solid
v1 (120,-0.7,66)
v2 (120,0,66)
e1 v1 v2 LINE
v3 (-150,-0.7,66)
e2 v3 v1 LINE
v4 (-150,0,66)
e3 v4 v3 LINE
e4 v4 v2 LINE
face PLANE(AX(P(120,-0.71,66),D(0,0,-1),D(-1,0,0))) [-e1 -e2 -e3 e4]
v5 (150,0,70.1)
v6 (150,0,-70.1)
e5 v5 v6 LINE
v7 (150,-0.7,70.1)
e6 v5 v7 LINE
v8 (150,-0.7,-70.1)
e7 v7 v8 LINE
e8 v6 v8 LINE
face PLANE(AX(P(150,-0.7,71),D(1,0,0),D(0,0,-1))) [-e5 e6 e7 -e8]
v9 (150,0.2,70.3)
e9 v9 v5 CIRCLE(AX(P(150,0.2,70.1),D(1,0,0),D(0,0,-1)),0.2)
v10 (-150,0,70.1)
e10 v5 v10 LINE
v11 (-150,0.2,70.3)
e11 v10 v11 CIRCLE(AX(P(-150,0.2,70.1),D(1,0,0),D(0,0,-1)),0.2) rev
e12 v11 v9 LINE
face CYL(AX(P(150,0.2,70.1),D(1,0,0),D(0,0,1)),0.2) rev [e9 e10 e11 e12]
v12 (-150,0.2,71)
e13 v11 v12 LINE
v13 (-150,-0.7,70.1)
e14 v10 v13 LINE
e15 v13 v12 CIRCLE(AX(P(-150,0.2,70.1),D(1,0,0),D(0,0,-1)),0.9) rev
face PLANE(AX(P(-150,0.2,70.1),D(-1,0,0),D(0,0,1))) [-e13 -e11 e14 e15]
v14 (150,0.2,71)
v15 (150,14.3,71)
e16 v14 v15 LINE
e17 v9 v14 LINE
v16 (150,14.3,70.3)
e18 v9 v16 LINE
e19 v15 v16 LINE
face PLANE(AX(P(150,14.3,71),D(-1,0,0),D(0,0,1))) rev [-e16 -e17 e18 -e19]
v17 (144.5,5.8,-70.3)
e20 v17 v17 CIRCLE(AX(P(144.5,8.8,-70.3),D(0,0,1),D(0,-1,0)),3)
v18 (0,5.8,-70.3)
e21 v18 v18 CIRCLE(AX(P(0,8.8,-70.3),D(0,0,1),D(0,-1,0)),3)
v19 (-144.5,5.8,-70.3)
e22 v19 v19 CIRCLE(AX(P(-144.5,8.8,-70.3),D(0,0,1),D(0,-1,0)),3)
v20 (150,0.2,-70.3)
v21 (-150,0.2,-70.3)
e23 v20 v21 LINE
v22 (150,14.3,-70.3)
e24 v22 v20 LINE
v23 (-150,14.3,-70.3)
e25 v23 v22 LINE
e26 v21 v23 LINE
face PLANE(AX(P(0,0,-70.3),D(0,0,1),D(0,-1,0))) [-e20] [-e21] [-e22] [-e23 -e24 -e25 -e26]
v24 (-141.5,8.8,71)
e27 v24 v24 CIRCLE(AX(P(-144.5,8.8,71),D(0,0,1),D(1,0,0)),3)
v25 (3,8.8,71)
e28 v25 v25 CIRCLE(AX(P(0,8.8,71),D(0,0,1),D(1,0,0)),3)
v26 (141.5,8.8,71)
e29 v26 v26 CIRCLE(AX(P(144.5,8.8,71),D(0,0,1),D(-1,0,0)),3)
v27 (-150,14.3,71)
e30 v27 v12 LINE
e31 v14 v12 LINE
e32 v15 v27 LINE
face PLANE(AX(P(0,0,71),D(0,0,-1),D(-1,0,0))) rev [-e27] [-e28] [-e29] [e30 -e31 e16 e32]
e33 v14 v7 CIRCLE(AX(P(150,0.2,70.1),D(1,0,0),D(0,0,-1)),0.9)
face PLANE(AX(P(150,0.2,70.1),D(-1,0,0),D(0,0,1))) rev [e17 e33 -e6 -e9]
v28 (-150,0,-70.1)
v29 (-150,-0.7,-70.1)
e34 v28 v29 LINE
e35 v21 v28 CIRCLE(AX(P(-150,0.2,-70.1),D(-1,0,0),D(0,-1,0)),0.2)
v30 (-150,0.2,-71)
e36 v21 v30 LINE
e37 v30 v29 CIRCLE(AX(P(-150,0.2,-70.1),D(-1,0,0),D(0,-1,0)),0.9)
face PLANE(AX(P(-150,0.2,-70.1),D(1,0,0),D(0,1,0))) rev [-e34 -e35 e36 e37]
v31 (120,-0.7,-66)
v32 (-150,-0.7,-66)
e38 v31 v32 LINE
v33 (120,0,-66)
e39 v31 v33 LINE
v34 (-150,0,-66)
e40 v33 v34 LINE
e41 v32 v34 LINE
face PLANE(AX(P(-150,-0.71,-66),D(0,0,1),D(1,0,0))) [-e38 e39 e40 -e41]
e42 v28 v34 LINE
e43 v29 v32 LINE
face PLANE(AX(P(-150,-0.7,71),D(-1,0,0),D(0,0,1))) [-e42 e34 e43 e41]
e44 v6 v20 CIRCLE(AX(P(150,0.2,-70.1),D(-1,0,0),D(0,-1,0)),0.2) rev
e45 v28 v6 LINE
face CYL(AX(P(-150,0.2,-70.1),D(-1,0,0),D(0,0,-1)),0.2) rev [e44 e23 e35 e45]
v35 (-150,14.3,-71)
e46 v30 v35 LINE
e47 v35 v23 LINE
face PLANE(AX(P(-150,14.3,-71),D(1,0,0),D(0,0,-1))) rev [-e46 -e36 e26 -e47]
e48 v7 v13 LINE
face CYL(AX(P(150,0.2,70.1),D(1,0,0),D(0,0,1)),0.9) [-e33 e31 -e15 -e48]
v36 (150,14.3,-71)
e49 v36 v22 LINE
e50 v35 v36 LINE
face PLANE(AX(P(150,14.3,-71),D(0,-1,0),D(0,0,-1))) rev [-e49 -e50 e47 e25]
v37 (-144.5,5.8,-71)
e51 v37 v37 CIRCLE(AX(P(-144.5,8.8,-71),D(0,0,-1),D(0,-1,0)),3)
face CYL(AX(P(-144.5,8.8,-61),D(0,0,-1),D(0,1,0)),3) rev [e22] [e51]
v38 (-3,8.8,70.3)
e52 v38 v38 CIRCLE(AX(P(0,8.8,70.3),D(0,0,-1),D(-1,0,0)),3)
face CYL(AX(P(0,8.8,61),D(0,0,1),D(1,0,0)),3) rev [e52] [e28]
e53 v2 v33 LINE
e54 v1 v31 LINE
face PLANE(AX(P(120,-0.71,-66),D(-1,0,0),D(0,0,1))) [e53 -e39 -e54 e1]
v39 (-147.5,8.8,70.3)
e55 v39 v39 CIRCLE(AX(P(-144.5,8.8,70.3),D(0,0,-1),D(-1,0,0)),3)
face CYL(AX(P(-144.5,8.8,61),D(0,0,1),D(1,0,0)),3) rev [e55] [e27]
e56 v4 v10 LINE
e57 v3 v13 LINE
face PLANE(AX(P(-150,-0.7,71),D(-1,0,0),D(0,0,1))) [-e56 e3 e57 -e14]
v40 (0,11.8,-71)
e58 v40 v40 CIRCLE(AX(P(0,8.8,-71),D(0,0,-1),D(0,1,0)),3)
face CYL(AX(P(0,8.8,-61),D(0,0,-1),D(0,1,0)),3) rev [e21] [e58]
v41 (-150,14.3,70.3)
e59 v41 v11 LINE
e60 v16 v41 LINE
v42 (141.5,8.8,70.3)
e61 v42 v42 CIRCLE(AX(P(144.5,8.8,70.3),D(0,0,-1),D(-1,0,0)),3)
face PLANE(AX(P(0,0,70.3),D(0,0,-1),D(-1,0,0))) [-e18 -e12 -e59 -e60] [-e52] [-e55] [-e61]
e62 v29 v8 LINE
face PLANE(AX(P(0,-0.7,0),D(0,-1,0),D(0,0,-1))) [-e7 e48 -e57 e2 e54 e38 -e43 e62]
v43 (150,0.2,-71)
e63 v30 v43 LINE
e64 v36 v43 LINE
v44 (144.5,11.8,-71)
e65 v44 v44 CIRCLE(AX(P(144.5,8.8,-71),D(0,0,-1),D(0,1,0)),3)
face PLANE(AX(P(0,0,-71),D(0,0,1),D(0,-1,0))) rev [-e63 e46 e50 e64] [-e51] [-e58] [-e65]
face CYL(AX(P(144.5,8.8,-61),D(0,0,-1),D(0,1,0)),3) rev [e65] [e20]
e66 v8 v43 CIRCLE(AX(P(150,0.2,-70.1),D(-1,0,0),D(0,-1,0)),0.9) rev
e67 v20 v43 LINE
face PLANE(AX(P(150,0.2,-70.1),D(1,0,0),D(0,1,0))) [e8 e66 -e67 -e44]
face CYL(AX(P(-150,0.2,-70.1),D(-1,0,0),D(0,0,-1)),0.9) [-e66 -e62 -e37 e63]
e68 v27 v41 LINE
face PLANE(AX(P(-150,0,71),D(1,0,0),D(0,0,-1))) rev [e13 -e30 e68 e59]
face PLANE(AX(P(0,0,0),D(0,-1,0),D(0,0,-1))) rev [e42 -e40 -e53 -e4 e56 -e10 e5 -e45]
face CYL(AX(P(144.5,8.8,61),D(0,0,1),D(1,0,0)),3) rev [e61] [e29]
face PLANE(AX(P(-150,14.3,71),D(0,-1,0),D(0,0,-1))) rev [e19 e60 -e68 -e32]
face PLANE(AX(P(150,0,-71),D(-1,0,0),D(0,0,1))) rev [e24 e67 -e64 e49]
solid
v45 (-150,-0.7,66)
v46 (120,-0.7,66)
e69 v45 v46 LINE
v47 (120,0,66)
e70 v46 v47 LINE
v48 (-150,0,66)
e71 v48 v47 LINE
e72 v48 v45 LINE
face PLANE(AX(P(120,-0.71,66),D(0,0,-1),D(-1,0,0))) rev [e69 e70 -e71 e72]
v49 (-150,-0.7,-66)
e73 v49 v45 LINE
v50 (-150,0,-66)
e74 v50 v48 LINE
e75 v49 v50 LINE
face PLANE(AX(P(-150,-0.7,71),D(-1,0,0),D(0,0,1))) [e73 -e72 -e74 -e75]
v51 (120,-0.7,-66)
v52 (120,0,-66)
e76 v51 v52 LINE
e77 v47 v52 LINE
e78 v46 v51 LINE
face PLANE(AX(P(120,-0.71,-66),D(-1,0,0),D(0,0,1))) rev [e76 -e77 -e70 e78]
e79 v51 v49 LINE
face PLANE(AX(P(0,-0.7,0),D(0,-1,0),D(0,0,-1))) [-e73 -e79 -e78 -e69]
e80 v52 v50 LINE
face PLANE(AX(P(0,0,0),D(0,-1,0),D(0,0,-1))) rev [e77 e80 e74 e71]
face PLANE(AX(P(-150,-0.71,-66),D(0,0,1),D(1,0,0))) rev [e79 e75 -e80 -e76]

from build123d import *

# Parameters (mm, degrees)
SKETCH_1_W                         = 300
SKETCH_1_H                         = 142
SM_BASE_FLANGE_1_DEPTH             = 0.7
SM_EDGE_FLANGE_1_STRIP_W           = 3.2
SM_EDGE_FLANGE_1_STRIP_H           = 0.7
SM_EDGE_FLANGE_1_STRIP_CUT_DEPTH   = 300
SM_EDGE_FLANGE_1_STRIP_2_W         = 3.2
SM_EDGE_FLANGE_1_STRIP_2_H         = 0.7
SM_EDGE_FLANGE_1_STRIP_CUT_2_DEPTH = 300
SM_EDGE_FLANGE_1_DEPTH             = 300
SM_EDGE_FLANGE_1_BEND_DEPTH        = 300
SKETCH_18_R                        = 3
CUT_EXTRUDE_1_DEPTH                = 10
CUT_EXTRUDE_START                  = -10
SKETCH_20_R                        = 3
CUT_EXTRUDE_2_DEPTH                = 10
SPLIT_BODIES_1_SURFACE_1_BACK      = 333.248
SPLIT_BODIES_1_SURFACE_1_DEPTH     = 666.496
SPLIT_BODIES_1_SURFACE_2_BACK      = 333.248
SPLIT_BODIES_1_SURFACE_2_DEPTH     = 666.496


# Sheet-metal steps are written as plain solids
with BuildPart() as part:
    # 草图1 → 基体-法兰1 (new body)
    with BuildSketch(Plane(origin=(0, 0, 0), x_dir=(1, 0, 0), z_dir=(0, 1, 0))):
        Rectangle(SKETCH_1_W, SKETCH_1_H)
    extrude(amount=-SM_BASE_FLANGE_1_DEPTH)

    # 边线-法兰1 strip (across the edge) → 边线-法兰1 strip cut (cut)
    with BuildSketch(Plane(origin=(150, 0, -71), x_dir=(0, 0, 1), z_dir=(-1, 0, 0))):
        with Locations((-0.7, -0.35)):
            Rectangle(SM_EDGE_FLANGE_1_STRIP_W, SM_EDGE_FLANGE_1_STRIP_H)
    extrude(amount=SM_EDGE_FLANGE_1_STRIP_CUT_DEPTH, mode=Mode.SUBTRACT)

    # 边线-法兰1 strip 2 (across the edge) → 边线-法兰1 strip cut 2 (cut)
    with BuildSketch(Plane(origin=(-150, 0, 71), x_dir=(0, 0, -1), z_dir=(1, 0, 0))):
        with Locations((-0.7, -0.35)):
            Rectangle(SM_EDGE_FLANGE_1_STRIP_2_W, SM_EDGE_FLANGE_1_STRIP_2_H)
    extrude(amount=SM_EDGE_FLANGE_1_STRIP_CUT_2_DEPTH, mode=Mode.SUBTRACT)

    # 边线-法兰1 section (across the edge) → 边线-法兰1 (add)
    with BuildSketch(Plane(origin=(150, 0, -71), x_dir=(0, 0, 1), z_dir=(-1, 0, 0))):
        with BuildLine():
            Line((0, 0.2), (0, 14.3))
            Line((0, 14.3), (0.7, 14.3))
            Line((0.7, 14.3), (0.7, 0.2))
            ThreePointArc((0.7, 0.2), (0.758578644, 0.058578644), (0.9, 0))
            Line((0.9, 0), (0.9, -0.7))
            ThreePointArc((0.9, -0.7), (0.263603897, -0.436396103), (0, 0.2))
        make_face()
    extrude(amount=SM_EDGE_FLANGE_1_DEPTH)

    # 边线-法兰1 section 2 (across the edge) → 边线-法兰1 bend (add)
    with BuildSketch(Plane(origin=(-150, 0, 71), x_dir=(0, 0, -1), z_dir=(1, 0, 0))):
        with BuildLine():
            Line((0, 0.2), (0, 14.3))
            Line((0, 14.3), (0.7, 14.3))
            Line((0.7, 14.3), (0.7, 0.2))
            ThreePointArc((0.7, 0.2), (0.758578644, 0.058578644), (0.9, 0))
            Line((0.9, 0), (0.9, -0.7))
            ThreePointArc((0.9, -0.7), (0.263603897, -0.436396103), (0, 0.2))
        make_face()
    extrude(amount=SM_EDGE_FLANGE_1_BEND_DEPTH)

    # 草图18 → 切除-拉伸1 (cut)
    with BuildSketch(Plane(origin=(0, 0, -71), x_dir=(-1, 0, 0), z_dir=(0, 0, -1))):
        with Locations(Location((-144.5, 8.8, 0), (0, 0, 90))):
            Circle(SKETCH_18_R)
        with Locations(Location((0, 8.8, 0), (0, 0, 90))):
            Circle(SKETCH_18_R)
        with Locations(Location((144.5, 8.8, 0), (0, 0, 270))):
            Circle(SKETCH_18_R)
    extrude(amount=-CUT_EXTRUDE_1_DEPTH, mode=Mode.SUBTRACT)

    # 草图20 → 切除-拉伸2 (cut)
    with BuildSketch(Plane.XY.offset(71).offset(CUT_EXTRUDE_START)):
        with Locations(Location((-144.5, 8.8, 0), (0, 0, 270))):
            Circle(SKETCH_20_R)
        with Locations(Location((0, 8.8, 0), (0, 0, 90))):
            Circle(SKETCH_20_R)
        with Locations(Location((144.5, 8.8, 0), (0, 0, 90))):
            Circle(SKETCH_20_R)
    extrude(amount=CUT_EXTRUDE_2_DEPTH, mode=Mode.SUBTRACT)


with BuildPart() as body_2:
    # Split Bodies 1: the piece behind the surface
    add(part.part)
    # Split Bodies 1 surface: a surface, the sketch's curves swept straight by 666.496 mm
    with BuildLine(Plane(origin=(0, 0, 0), x_dir=(1, 0, 0), z_dir=(0, 1, 0)).offset(-SPLIT_BODIES_1_SURFACE_1_BACK), mode=Mode.PRIVATE) as split_bodies_1_surface_1_path:
        Line((-150, 66), (120, 66))
        Line((120, 66), (120, -66))
        Line((120, -66), (-150, -66))
    split_bodies_1_surface_1 = Shell.extrude(split_bodies_1_surface_1_path.wire(), (0 * SPLIT_BODIES_1_SURFACE_1_DEPTH, 1 * SPLIT_BODIES_1_SURFACE_1_DEPTH, 0 * SPLIT_BODIES_1_SURFACE_1_DEPTH))
    split(bisect_by=split_bodies_1_surface_1, keep=Keep.BOTTOM)


with BuildPart() as part_1:
    add(part.part)

    # Split Bodies 1: split by a surface, the side it looks to stays
    # Split Bodies 1 surface: a surface, the sketch's curves swept straight by 666.496 mm
    with BuildLine(Plane(origin=(0, 0, 0), x_dir=(1, 0, 0), z_dir=(0, 1, 0)).offset(-SPLIT_BODIES_1_SURFACE_2_BACK), mode=Mode.PRIVATE) as split_bodies_1_surface_2_path:
        Line((-150, 66), (120, 66))
        Line((120, 66), (120, -66))
        Line((120, -66), (-150, -66))
    split_bodies_1_surface_2 = Shell.extrude(split_bodies_1_surface_2_path.wire(), (0 * SPLIT_BODIES_1_SURFACE_2_DEPTH, 1 * SPLIT_BODIES_1_SURFACE_2_DEPTH, 0 * SPLIT_BODIES_1_SURFACE_2_DEPTH))
    split(bisect_by=split_bodies_1_surface_2, keep=Keep.TOP)


solid = Compound([body_2.part, part_1.part])
